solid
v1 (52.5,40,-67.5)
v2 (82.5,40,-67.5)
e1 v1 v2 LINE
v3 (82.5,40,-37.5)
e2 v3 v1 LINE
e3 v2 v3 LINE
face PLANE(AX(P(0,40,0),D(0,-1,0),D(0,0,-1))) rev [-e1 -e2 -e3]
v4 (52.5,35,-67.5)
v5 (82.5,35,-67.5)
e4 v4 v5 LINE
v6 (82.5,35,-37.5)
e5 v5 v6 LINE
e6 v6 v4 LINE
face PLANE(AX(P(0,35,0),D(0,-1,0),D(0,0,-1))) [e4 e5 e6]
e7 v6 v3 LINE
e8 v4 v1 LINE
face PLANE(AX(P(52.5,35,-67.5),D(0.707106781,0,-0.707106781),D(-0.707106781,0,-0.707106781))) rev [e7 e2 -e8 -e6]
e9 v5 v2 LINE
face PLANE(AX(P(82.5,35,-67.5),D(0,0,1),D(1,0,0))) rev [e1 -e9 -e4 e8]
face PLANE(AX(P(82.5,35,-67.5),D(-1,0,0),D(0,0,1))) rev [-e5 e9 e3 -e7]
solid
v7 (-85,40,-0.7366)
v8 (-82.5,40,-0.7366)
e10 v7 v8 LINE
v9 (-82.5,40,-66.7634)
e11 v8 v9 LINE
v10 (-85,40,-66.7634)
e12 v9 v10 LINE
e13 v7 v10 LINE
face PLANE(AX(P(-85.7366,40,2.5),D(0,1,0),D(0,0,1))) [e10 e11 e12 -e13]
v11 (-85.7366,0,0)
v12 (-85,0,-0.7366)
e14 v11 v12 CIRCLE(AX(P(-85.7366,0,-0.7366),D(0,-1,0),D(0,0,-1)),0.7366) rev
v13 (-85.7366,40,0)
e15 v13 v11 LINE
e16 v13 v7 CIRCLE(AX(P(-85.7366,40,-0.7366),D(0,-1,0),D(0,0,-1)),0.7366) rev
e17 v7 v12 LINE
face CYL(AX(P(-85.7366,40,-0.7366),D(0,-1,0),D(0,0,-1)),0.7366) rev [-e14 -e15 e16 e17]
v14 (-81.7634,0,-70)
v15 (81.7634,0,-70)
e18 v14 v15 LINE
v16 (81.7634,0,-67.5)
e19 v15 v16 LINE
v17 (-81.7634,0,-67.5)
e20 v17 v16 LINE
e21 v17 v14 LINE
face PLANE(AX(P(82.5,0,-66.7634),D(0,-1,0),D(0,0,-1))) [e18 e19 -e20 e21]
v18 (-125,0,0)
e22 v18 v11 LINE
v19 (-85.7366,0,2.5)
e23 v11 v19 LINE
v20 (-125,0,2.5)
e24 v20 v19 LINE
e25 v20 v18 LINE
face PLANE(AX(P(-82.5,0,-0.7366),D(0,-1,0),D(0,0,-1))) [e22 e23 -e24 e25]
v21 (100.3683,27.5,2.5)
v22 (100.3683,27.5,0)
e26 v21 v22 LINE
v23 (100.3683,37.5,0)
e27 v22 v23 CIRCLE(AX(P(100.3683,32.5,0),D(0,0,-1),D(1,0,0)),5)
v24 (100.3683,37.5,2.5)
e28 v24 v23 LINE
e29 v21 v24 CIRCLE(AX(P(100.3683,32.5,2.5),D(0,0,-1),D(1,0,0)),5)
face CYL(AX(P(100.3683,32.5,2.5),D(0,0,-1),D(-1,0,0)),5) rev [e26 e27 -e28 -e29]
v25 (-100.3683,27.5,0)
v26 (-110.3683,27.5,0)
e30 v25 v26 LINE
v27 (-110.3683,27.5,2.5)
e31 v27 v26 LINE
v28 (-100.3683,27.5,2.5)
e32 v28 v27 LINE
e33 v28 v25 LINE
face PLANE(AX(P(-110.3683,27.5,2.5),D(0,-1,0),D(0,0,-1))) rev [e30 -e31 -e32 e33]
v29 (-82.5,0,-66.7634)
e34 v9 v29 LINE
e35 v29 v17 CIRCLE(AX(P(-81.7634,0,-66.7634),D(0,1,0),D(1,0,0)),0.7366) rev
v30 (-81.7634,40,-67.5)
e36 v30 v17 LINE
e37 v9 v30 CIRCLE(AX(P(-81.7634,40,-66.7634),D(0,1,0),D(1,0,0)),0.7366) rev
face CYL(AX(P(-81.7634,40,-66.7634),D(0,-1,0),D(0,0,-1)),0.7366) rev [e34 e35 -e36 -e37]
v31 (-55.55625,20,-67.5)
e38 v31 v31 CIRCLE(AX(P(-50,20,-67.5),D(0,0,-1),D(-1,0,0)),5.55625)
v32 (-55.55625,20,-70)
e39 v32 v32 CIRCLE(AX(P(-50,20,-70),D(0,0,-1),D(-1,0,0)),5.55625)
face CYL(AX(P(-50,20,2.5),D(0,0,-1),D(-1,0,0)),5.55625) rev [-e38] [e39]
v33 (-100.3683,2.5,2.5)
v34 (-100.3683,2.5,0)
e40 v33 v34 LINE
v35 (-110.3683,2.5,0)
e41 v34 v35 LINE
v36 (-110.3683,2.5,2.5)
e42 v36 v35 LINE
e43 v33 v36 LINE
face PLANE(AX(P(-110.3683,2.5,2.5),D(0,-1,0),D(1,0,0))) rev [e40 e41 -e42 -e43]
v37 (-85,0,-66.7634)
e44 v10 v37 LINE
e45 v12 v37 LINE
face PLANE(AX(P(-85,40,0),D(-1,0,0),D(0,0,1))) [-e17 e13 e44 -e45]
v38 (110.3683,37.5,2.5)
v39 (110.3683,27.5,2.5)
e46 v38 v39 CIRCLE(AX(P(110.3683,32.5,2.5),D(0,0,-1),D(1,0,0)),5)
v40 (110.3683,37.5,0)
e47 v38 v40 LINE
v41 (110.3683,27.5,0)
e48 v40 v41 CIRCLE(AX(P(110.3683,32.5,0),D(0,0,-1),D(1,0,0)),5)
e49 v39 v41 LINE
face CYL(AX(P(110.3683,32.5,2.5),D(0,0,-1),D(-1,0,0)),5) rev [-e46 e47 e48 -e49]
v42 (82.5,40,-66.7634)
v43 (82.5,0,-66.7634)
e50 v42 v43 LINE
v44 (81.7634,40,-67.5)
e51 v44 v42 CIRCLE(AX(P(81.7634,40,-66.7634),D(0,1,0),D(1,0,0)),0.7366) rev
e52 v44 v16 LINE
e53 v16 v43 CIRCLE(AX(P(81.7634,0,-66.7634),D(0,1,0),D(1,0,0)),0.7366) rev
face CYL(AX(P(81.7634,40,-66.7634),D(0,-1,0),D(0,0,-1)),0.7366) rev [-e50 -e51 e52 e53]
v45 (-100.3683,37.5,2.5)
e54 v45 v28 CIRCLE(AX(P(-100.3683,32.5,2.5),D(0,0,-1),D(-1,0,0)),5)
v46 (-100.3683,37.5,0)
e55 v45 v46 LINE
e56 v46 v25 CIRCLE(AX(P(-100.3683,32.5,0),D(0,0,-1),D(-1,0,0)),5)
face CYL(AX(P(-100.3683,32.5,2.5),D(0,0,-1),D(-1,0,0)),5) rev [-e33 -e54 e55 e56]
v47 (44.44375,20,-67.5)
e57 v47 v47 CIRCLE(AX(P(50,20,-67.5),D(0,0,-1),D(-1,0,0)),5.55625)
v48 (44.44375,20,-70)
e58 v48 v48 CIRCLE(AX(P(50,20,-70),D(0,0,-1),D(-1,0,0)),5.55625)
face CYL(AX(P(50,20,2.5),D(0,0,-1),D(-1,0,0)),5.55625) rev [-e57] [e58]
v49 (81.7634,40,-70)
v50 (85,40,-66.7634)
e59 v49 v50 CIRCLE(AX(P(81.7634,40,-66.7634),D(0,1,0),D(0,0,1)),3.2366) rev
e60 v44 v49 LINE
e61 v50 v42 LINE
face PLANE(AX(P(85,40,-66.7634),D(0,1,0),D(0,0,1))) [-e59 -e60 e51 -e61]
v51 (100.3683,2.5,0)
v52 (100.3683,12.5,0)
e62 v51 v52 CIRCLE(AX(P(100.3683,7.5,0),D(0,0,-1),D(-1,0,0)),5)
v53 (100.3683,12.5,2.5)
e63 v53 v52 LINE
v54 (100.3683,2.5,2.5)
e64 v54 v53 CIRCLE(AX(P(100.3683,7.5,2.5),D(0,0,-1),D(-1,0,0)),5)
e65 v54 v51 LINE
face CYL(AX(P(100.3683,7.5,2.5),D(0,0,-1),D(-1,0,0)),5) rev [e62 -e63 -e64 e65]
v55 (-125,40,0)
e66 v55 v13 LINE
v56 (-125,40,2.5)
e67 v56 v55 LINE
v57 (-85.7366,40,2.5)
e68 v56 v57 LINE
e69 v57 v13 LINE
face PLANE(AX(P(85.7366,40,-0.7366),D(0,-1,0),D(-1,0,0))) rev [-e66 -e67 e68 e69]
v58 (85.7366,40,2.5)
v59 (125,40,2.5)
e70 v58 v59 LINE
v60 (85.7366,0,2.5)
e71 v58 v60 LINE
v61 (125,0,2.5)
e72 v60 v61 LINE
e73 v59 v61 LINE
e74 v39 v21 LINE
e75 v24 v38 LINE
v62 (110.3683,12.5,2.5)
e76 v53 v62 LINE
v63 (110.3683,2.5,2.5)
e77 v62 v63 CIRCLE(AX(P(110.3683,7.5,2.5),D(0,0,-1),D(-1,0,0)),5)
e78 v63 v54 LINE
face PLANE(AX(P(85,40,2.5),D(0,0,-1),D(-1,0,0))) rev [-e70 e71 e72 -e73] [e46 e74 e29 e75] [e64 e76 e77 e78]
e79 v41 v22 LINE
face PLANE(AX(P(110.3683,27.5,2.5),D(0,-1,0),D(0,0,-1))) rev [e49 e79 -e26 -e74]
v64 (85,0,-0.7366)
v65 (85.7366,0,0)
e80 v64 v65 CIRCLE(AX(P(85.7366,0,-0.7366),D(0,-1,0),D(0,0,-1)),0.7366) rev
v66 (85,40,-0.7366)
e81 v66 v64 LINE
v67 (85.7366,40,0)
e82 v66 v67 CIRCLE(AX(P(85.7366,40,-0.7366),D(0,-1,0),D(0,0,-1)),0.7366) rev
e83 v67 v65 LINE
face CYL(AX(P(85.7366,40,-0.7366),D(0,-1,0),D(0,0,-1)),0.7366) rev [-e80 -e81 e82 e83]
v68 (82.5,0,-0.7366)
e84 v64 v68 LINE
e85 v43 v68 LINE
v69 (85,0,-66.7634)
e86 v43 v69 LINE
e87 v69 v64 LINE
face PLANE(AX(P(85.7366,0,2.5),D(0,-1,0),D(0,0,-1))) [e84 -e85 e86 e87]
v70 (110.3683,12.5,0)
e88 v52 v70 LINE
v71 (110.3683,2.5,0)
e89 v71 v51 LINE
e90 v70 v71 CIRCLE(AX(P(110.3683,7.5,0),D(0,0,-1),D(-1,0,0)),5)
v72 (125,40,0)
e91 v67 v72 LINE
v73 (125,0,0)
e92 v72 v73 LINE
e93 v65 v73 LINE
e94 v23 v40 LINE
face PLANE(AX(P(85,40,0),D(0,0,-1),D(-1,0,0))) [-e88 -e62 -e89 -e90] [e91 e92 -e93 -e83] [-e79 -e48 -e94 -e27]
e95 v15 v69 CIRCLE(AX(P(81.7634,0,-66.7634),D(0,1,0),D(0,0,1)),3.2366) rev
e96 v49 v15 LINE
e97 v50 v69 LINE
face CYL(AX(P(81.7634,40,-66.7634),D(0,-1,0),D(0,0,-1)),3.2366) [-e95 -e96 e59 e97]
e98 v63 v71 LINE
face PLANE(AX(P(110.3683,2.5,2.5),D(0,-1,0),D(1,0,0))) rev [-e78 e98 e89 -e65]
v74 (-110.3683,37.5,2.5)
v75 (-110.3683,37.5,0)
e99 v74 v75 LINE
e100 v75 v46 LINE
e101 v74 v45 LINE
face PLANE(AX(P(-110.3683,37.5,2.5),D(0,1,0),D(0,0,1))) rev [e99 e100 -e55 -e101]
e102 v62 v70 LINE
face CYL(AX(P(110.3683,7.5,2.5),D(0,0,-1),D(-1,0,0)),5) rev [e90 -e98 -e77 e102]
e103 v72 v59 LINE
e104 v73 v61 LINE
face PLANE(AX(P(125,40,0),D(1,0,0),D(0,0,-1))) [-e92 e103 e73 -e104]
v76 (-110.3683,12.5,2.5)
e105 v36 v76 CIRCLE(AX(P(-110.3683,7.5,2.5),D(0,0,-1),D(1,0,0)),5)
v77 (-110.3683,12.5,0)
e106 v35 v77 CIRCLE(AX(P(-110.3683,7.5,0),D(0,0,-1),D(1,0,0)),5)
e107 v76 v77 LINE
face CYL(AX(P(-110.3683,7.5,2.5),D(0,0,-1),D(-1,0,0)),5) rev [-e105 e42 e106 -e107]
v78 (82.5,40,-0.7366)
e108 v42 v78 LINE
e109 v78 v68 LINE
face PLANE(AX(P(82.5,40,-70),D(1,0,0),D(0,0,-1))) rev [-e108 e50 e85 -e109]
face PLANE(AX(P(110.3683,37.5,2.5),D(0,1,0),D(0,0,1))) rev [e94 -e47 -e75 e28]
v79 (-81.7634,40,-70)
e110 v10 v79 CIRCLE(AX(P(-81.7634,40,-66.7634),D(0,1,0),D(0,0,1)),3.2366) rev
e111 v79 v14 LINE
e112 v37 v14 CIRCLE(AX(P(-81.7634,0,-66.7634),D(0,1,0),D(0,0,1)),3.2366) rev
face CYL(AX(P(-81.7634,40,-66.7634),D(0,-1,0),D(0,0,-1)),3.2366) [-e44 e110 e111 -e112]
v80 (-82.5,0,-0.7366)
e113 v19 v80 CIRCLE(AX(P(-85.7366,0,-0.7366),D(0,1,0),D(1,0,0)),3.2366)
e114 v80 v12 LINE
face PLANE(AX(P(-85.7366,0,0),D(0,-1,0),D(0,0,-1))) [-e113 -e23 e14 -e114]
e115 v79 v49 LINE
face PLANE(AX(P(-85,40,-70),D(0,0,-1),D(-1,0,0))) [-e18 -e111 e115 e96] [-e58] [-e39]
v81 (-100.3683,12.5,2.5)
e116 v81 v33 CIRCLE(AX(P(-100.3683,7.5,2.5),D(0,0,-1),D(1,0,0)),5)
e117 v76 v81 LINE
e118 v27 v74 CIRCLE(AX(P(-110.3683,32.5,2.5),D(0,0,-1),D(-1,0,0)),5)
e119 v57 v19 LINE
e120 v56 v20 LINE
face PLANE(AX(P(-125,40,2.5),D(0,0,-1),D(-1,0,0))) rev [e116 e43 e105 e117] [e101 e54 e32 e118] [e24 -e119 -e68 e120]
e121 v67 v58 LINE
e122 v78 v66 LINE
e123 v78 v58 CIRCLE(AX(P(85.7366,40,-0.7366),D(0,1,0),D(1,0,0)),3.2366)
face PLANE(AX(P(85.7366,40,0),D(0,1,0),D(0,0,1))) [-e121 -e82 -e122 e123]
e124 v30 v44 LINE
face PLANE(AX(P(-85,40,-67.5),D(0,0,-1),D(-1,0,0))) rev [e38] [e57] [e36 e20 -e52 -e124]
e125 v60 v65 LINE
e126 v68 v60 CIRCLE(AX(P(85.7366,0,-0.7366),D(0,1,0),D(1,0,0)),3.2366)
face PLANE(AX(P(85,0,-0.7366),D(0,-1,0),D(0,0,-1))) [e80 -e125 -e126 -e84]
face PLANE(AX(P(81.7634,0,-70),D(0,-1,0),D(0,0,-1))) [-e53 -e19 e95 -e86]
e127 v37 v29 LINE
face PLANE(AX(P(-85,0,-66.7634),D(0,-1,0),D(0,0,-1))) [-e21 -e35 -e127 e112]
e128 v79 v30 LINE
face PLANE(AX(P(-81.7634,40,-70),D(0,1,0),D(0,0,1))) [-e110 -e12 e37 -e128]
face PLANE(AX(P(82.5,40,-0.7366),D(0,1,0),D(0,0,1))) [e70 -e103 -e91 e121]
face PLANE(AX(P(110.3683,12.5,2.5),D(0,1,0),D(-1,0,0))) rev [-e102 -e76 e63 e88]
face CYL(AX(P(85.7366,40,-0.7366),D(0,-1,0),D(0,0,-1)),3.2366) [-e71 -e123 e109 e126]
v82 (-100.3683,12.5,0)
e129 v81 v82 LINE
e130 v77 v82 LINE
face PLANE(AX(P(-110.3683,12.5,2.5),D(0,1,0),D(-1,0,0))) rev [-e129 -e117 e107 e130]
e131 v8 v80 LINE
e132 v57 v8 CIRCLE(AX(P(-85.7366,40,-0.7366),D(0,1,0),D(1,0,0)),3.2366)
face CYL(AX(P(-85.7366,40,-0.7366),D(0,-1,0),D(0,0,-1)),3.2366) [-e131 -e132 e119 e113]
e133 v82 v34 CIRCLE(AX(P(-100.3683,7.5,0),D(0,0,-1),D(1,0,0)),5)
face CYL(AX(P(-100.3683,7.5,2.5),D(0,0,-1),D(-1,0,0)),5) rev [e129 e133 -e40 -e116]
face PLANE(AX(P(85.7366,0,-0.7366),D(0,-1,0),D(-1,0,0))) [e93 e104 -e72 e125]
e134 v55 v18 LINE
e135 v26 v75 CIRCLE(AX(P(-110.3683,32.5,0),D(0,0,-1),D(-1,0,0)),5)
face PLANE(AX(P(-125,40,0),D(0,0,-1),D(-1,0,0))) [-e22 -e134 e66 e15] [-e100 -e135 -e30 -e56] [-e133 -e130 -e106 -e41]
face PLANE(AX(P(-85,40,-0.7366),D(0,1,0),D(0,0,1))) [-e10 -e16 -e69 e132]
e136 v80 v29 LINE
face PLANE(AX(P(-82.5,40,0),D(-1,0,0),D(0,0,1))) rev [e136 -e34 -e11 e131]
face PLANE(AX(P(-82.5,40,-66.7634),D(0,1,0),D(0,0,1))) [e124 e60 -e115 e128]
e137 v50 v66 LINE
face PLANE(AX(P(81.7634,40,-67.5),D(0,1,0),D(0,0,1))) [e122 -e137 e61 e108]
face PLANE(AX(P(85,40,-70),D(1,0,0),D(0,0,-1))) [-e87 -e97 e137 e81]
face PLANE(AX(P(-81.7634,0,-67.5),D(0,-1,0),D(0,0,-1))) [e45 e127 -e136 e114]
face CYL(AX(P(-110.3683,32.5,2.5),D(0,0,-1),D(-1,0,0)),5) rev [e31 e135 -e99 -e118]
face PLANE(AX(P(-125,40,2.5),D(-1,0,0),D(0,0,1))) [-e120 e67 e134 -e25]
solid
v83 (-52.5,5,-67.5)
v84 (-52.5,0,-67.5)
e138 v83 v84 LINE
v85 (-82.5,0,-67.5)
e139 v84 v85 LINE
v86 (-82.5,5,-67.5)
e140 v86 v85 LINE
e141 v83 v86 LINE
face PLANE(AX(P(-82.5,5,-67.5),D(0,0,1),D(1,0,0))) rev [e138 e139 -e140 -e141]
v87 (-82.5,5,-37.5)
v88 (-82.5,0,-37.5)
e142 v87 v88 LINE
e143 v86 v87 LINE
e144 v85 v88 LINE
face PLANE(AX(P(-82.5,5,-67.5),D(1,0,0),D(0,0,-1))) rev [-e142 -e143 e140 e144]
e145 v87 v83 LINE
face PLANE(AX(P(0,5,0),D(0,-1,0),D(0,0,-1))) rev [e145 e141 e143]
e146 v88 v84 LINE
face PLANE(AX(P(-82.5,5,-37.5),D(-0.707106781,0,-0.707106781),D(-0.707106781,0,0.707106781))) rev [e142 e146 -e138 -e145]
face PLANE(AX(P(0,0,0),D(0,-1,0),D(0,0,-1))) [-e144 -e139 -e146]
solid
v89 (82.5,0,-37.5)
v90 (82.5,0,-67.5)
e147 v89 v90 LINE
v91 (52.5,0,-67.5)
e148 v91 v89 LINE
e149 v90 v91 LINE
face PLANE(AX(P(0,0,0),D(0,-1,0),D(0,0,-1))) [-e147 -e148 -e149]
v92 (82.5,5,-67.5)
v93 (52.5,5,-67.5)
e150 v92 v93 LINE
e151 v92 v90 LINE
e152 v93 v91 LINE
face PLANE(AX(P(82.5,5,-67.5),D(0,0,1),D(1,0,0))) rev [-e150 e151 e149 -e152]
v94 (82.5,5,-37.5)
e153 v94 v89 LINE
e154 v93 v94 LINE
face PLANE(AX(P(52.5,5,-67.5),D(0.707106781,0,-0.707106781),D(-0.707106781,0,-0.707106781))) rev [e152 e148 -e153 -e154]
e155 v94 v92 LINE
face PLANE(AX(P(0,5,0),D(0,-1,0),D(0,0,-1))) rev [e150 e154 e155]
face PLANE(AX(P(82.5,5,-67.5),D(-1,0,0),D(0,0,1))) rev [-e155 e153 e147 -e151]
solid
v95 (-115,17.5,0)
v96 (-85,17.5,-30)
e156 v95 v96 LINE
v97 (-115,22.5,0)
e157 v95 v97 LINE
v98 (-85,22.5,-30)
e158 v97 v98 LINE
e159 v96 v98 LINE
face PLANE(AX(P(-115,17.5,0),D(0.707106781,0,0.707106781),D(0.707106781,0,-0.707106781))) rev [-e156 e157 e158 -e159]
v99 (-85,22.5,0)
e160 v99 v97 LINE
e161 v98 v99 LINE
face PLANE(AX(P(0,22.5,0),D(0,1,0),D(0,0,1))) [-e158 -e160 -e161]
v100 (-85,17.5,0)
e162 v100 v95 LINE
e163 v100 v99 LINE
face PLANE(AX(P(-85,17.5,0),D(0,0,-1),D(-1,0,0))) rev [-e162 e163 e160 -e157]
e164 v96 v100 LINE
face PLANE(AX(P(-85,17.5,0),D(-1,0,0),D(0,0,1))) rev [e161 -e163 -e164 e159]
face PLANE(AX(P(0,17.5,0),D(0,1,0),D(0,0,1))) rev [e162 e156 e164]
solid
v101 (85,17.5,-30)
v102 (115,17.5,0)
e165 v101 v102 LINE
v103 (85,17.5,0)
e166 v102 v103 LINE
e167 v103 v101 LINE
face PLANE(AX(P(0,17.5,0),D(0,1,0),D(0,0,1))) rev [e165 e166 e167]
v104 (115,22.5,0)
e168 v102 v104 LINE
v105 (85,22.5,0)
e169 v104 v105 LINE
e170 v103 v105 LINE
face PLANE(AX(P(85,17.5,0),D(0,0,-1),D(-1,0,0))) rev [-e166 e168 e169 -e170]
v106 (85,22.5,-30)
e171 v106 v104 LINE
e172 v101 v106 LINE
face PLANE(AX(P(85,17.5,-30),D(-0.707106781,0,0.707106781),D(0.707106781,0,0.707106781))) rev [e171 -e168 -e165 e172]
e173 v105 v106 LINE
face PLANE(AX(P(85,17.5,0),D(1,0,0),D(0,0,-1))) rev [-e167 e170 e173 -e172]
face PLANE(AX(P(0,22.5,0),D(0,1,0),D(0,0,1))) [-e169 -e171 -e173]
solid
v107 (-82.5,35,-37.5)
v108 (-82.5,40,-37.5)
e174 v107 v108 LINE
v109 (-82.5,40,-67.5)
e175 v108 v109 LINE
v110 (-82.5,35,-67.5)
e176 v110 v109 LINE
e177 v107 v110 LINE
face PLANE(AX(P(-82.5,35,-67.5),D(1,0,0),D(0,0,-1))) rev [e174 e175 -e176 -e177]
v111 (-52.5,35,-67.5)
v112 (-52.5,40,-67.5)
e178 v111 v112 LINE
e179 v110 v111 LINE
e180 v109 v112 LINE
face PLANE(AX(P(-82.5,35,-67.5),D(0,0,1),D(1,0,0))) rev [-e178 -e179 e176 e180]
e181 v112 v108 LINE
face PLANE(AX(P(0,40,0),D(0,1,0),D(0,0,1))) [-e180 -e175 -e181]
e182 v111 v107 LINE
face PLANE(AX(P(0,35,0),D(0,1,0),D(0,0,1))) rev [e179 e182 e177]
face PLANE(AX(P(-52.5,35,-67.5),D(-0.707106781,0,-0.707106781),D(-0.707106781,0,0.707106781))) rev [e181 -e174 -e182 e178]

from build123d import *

# Parameters (mm, degrees)
BASE_FLANGE1_DEPTH = 40
GUSSET5_THICKNESS  = 5
GUSSET7_THICKNESS  = 5
SKETCH10_R         = 5.55625
CUT_EXTRUDE2_DEPTH = 150.937486974
GUSSET9_THICKNESS  = 5
GUSSET10_THICKNESS = 5
GUSSET11_THICKNESS = 5
GUSSET12_THICKNESS = 5
CUT_EXTRUDE3_DEPTH = 149.744747806


# Sheet-metal steps are written as plain solids
with BuildPart() as part:
    # Sketch1 → Base-Flange1 (new body)
    with BuildSketch(Plane(origin=(0, 0, 0), x_dir=(1, 0, 0), z_dir=(0, 1, 0))):
        with BuildLine():
            Line((-125, 0), (-85.7366, 0))
            ThreePointArc((-85.7366, 0), (-85.215745145, 0.215745145), (-85, 0.7366))
            Line((-85, 0.7366), (-85, 66.7634))
            ThreePointArc((-85, 66.7634), (-84.052021808, 69.052021808), (-81.7634, 70))
            Line((-81.7634, 70), (81.7634, 70))
            ThreePointArc((81.7634, 70), (84.052021808, 69.052021808), (85, 66.7634))
            Line((85, 66.7634), (85, 0.7366))
            ThreePointArc((85, 0.7366), (85.215745145, 0.215745145), (85.7366, 0))
            Line((85.7366, 0), (125, 0))
            Line((125, 0), (125, -2.5))
            Line((125, -2.5), (85.7366, -2.5))
            ThreePointArc((85.7366, -2.5), (83.447978192, -1.552021808), (82.5, 0.7366))
            Line((82.5, 0.7366), (82.5, 66.7634))
            ThreePointArc((82.5, 66.7634), (82.284254855, 67.284254855), (81.7634, 67.5))
            Line((81.7634, 67.5), (-81.7634, 67.5))
            ThreePointArc((-81.7634, 67.5), (-82.284254855, 67.284254855), (-82.5, 66.7634))
            Line((-82.5, 66.7634), (-82.5, 0.7366))
            ThreePointArc((-82.5, 0.7366), (-83.447978192, -1.552021808), (-85.7366, -2.5))
            Line((-85.7366, -2.5), (-125, -2.5))
            Line((-125, -2.5), (-125, 0))
        make_face()
    extrude(amount=BASE_FLANGE1_DEPTH)

    # Sketch10 → Cut-Extrude2 (cut, through all)
    with BuildSketch(Plane(origin=(0, 0, -70), x_dir=(-1, 0, 0), z_dir=(0, 0, -1))):
        with Locations((-50, 20)):
            Circle(SKETCH10_R)
        with Locations((50, 20)):
            Circle(SKETCH10_R)
    extrude(amount=-CUT_EXTRUDE2_DEPTH, mode=Mode.SUBTRACT)

    # Sketch15 → Cut-Extrude3 (cut, through all)
    with BuildSketch(Plane(origin=(0, 0, 0), x_dir=(-1, 0, 0), z_dir=(0, 0, -1))):
        with BuildLine():
            Line((-110.3683, 12.5), (-100.3683, 12.5))
            ThreePointArc((-100.3683, 12.5), (-95.3683, 7.5), (-100.3683, 2.5))
            Line((-100.3683, 2.5), (-110.3683, 2.5))
            ThreePointArc((-110.3683, 2.5), (-115.3683, 7.5), (-110.3683, 12.5))
        make_face()
        with BuildLine():
            Line((110.3683, 12.5), (100.3683, 12.5))
            ThreePointArc((100.3683, 12.5), (95.3683, 7.5), (100.3683, 2.5))
            Line((100.3683, 2.5), (110.3683, 2.5))
            ThreePointArc((110.3683, 2.5), (115.3683, 7.5), (110.3683, 12.5))
        make_face()
        with BuildLine():
            Line((-110.3683, 27.5), (-100.3683, 27.5))
            ThreePointArc((-100.3683, 27.5), (-95.3683, 32.5), (-100.3683, 37.5))
            Line((-100.3683, 37.5), (-110.3683, 37.5))
            ThreePointArc((-110.3683, 37.5), (-115.3683, 32.5), (-110.3683, 27.5))
        make_face()
        with BuildLine():
            Line((110.3683, 27.5), (100.3683, 27.5))
            ThreePointArc((100.3683, 27.5), (95.3683, 32.5), (100.3683, 37.5))
            Line((100.3683, 37.5), (110.3683, 37.5))
            ThreePointArc((110.3683, 37.5), (115.3683, 32.5), (110.3683, 27.5))
        make_face()
    extrude(amount=-CUT_EXTRUDE3_DEPTH, mode=Mode.SUBTRACT)


with BuildPart() as body_2:
    # Gusset5: a gusset: a plate 5.0 thick in the corner of two members, its outline drawn in place
    gusset5_outline = Wire([Line((-85, 17.5, 0), (-115, 17.5, 0)), Line((-115, 17.5, 0), (-85, 17.5, -30)), Line((-85, 17.5, -30), (-85, 17.5, 0))])
    add(extrude(Face(gusset5_outline), amount=GUSSET5_THICKNESS, dir=(0, 1, 0)))


with BuildPart() as body_3:
    # Gusset7: a gusset: a plate 5.0 thick in the corner of two members, its outline drawn in place
    gusset7_outline = Wire([Line((85, 17.5, 0), (85, 17.5, -30)), Line((85, 17.5, -30), (115, 17.5, 0)), Line((115, 17.5, 0), (85, 17.5, 0))])
    add(extrude(Face(gusset7_outline), amount=GUSSET7_THICKNESS, dir=(0, 1, 0)))


with BuildPart() as body_4:
    # Gusset9: a gusset: a plate 5.0 thick in the corner of two members, its outline drawn in place
    gusset9_outline = Wire([Line((-82.5, 35, -67.5), (-52.5, 35, -67.5)), Line((-52.5, 35, -67.5), (-82.5, 35, -37.5)), Line((-82.5, 35, -37.5), (-82.5, 35, -67.5))])
    add(extrude(Face(gusset9_outline), amount=GUSSET9_THICKNESS, dir=(0, 1, 0)))


with BuildPart() as body_5:
    # Gusset10: a gusset: a plate 5.0 thick in the corner of two members, its outline drawn in place
    gusset10_outline = Wire([Line((-82.5, 5, -67.5), (-82.5, 5, -37.5)), Line((-82.5, 5, -37.5), (-52.5, 5, -67.5)), Line((-52.5, 5, -67.5), (-82.5, 5, -67.5))])
    add(extrude(Face(gusset10_outline), amount=GUSSET10_THICKNESS, dir=(0, -1, 0)))


with BuildPart() as body_6:
    # Gusset11: a gusset: a plate 5.0 thick in the corner of two members, its outline drawn in place
    gusset11_outline = Wire([Line((82.5, 5, -67.5), (52.5, 5, -67.5)), Line((52.5, 5, -67.5), (82.5, 5, -37.5)), Line((82.5, 5, -37.5), (82.5, 5, -67.5))])
    add(extrude(Face(gusset11_outline), amount=GUSSET11_THICKNESS, dir=(0, -1, 0)))


with BuildPart() as body_7:
    # Gusset12: a gusset: a plate 5.0 thick in the corner of two members, its outline drawn in place
    gusset12_outline = Wire([Line((82.5, 40, -67.5), (52.5, 40, -67.5)), Line((52.5, 40, -67.5), (82.5, 40, -37.5)), Line((82.5, 40, -37.5), (82.5, 40, -67.5))])
    add(extrude(Face(gusset12_outline), amount=GUSSET12_THICKNESS, dir=(0, -1, 0)))


solid = Compound([part.part, body_2.part, body_3.part, body_4.part, body_5.part, body_6.part, body_7.part])
